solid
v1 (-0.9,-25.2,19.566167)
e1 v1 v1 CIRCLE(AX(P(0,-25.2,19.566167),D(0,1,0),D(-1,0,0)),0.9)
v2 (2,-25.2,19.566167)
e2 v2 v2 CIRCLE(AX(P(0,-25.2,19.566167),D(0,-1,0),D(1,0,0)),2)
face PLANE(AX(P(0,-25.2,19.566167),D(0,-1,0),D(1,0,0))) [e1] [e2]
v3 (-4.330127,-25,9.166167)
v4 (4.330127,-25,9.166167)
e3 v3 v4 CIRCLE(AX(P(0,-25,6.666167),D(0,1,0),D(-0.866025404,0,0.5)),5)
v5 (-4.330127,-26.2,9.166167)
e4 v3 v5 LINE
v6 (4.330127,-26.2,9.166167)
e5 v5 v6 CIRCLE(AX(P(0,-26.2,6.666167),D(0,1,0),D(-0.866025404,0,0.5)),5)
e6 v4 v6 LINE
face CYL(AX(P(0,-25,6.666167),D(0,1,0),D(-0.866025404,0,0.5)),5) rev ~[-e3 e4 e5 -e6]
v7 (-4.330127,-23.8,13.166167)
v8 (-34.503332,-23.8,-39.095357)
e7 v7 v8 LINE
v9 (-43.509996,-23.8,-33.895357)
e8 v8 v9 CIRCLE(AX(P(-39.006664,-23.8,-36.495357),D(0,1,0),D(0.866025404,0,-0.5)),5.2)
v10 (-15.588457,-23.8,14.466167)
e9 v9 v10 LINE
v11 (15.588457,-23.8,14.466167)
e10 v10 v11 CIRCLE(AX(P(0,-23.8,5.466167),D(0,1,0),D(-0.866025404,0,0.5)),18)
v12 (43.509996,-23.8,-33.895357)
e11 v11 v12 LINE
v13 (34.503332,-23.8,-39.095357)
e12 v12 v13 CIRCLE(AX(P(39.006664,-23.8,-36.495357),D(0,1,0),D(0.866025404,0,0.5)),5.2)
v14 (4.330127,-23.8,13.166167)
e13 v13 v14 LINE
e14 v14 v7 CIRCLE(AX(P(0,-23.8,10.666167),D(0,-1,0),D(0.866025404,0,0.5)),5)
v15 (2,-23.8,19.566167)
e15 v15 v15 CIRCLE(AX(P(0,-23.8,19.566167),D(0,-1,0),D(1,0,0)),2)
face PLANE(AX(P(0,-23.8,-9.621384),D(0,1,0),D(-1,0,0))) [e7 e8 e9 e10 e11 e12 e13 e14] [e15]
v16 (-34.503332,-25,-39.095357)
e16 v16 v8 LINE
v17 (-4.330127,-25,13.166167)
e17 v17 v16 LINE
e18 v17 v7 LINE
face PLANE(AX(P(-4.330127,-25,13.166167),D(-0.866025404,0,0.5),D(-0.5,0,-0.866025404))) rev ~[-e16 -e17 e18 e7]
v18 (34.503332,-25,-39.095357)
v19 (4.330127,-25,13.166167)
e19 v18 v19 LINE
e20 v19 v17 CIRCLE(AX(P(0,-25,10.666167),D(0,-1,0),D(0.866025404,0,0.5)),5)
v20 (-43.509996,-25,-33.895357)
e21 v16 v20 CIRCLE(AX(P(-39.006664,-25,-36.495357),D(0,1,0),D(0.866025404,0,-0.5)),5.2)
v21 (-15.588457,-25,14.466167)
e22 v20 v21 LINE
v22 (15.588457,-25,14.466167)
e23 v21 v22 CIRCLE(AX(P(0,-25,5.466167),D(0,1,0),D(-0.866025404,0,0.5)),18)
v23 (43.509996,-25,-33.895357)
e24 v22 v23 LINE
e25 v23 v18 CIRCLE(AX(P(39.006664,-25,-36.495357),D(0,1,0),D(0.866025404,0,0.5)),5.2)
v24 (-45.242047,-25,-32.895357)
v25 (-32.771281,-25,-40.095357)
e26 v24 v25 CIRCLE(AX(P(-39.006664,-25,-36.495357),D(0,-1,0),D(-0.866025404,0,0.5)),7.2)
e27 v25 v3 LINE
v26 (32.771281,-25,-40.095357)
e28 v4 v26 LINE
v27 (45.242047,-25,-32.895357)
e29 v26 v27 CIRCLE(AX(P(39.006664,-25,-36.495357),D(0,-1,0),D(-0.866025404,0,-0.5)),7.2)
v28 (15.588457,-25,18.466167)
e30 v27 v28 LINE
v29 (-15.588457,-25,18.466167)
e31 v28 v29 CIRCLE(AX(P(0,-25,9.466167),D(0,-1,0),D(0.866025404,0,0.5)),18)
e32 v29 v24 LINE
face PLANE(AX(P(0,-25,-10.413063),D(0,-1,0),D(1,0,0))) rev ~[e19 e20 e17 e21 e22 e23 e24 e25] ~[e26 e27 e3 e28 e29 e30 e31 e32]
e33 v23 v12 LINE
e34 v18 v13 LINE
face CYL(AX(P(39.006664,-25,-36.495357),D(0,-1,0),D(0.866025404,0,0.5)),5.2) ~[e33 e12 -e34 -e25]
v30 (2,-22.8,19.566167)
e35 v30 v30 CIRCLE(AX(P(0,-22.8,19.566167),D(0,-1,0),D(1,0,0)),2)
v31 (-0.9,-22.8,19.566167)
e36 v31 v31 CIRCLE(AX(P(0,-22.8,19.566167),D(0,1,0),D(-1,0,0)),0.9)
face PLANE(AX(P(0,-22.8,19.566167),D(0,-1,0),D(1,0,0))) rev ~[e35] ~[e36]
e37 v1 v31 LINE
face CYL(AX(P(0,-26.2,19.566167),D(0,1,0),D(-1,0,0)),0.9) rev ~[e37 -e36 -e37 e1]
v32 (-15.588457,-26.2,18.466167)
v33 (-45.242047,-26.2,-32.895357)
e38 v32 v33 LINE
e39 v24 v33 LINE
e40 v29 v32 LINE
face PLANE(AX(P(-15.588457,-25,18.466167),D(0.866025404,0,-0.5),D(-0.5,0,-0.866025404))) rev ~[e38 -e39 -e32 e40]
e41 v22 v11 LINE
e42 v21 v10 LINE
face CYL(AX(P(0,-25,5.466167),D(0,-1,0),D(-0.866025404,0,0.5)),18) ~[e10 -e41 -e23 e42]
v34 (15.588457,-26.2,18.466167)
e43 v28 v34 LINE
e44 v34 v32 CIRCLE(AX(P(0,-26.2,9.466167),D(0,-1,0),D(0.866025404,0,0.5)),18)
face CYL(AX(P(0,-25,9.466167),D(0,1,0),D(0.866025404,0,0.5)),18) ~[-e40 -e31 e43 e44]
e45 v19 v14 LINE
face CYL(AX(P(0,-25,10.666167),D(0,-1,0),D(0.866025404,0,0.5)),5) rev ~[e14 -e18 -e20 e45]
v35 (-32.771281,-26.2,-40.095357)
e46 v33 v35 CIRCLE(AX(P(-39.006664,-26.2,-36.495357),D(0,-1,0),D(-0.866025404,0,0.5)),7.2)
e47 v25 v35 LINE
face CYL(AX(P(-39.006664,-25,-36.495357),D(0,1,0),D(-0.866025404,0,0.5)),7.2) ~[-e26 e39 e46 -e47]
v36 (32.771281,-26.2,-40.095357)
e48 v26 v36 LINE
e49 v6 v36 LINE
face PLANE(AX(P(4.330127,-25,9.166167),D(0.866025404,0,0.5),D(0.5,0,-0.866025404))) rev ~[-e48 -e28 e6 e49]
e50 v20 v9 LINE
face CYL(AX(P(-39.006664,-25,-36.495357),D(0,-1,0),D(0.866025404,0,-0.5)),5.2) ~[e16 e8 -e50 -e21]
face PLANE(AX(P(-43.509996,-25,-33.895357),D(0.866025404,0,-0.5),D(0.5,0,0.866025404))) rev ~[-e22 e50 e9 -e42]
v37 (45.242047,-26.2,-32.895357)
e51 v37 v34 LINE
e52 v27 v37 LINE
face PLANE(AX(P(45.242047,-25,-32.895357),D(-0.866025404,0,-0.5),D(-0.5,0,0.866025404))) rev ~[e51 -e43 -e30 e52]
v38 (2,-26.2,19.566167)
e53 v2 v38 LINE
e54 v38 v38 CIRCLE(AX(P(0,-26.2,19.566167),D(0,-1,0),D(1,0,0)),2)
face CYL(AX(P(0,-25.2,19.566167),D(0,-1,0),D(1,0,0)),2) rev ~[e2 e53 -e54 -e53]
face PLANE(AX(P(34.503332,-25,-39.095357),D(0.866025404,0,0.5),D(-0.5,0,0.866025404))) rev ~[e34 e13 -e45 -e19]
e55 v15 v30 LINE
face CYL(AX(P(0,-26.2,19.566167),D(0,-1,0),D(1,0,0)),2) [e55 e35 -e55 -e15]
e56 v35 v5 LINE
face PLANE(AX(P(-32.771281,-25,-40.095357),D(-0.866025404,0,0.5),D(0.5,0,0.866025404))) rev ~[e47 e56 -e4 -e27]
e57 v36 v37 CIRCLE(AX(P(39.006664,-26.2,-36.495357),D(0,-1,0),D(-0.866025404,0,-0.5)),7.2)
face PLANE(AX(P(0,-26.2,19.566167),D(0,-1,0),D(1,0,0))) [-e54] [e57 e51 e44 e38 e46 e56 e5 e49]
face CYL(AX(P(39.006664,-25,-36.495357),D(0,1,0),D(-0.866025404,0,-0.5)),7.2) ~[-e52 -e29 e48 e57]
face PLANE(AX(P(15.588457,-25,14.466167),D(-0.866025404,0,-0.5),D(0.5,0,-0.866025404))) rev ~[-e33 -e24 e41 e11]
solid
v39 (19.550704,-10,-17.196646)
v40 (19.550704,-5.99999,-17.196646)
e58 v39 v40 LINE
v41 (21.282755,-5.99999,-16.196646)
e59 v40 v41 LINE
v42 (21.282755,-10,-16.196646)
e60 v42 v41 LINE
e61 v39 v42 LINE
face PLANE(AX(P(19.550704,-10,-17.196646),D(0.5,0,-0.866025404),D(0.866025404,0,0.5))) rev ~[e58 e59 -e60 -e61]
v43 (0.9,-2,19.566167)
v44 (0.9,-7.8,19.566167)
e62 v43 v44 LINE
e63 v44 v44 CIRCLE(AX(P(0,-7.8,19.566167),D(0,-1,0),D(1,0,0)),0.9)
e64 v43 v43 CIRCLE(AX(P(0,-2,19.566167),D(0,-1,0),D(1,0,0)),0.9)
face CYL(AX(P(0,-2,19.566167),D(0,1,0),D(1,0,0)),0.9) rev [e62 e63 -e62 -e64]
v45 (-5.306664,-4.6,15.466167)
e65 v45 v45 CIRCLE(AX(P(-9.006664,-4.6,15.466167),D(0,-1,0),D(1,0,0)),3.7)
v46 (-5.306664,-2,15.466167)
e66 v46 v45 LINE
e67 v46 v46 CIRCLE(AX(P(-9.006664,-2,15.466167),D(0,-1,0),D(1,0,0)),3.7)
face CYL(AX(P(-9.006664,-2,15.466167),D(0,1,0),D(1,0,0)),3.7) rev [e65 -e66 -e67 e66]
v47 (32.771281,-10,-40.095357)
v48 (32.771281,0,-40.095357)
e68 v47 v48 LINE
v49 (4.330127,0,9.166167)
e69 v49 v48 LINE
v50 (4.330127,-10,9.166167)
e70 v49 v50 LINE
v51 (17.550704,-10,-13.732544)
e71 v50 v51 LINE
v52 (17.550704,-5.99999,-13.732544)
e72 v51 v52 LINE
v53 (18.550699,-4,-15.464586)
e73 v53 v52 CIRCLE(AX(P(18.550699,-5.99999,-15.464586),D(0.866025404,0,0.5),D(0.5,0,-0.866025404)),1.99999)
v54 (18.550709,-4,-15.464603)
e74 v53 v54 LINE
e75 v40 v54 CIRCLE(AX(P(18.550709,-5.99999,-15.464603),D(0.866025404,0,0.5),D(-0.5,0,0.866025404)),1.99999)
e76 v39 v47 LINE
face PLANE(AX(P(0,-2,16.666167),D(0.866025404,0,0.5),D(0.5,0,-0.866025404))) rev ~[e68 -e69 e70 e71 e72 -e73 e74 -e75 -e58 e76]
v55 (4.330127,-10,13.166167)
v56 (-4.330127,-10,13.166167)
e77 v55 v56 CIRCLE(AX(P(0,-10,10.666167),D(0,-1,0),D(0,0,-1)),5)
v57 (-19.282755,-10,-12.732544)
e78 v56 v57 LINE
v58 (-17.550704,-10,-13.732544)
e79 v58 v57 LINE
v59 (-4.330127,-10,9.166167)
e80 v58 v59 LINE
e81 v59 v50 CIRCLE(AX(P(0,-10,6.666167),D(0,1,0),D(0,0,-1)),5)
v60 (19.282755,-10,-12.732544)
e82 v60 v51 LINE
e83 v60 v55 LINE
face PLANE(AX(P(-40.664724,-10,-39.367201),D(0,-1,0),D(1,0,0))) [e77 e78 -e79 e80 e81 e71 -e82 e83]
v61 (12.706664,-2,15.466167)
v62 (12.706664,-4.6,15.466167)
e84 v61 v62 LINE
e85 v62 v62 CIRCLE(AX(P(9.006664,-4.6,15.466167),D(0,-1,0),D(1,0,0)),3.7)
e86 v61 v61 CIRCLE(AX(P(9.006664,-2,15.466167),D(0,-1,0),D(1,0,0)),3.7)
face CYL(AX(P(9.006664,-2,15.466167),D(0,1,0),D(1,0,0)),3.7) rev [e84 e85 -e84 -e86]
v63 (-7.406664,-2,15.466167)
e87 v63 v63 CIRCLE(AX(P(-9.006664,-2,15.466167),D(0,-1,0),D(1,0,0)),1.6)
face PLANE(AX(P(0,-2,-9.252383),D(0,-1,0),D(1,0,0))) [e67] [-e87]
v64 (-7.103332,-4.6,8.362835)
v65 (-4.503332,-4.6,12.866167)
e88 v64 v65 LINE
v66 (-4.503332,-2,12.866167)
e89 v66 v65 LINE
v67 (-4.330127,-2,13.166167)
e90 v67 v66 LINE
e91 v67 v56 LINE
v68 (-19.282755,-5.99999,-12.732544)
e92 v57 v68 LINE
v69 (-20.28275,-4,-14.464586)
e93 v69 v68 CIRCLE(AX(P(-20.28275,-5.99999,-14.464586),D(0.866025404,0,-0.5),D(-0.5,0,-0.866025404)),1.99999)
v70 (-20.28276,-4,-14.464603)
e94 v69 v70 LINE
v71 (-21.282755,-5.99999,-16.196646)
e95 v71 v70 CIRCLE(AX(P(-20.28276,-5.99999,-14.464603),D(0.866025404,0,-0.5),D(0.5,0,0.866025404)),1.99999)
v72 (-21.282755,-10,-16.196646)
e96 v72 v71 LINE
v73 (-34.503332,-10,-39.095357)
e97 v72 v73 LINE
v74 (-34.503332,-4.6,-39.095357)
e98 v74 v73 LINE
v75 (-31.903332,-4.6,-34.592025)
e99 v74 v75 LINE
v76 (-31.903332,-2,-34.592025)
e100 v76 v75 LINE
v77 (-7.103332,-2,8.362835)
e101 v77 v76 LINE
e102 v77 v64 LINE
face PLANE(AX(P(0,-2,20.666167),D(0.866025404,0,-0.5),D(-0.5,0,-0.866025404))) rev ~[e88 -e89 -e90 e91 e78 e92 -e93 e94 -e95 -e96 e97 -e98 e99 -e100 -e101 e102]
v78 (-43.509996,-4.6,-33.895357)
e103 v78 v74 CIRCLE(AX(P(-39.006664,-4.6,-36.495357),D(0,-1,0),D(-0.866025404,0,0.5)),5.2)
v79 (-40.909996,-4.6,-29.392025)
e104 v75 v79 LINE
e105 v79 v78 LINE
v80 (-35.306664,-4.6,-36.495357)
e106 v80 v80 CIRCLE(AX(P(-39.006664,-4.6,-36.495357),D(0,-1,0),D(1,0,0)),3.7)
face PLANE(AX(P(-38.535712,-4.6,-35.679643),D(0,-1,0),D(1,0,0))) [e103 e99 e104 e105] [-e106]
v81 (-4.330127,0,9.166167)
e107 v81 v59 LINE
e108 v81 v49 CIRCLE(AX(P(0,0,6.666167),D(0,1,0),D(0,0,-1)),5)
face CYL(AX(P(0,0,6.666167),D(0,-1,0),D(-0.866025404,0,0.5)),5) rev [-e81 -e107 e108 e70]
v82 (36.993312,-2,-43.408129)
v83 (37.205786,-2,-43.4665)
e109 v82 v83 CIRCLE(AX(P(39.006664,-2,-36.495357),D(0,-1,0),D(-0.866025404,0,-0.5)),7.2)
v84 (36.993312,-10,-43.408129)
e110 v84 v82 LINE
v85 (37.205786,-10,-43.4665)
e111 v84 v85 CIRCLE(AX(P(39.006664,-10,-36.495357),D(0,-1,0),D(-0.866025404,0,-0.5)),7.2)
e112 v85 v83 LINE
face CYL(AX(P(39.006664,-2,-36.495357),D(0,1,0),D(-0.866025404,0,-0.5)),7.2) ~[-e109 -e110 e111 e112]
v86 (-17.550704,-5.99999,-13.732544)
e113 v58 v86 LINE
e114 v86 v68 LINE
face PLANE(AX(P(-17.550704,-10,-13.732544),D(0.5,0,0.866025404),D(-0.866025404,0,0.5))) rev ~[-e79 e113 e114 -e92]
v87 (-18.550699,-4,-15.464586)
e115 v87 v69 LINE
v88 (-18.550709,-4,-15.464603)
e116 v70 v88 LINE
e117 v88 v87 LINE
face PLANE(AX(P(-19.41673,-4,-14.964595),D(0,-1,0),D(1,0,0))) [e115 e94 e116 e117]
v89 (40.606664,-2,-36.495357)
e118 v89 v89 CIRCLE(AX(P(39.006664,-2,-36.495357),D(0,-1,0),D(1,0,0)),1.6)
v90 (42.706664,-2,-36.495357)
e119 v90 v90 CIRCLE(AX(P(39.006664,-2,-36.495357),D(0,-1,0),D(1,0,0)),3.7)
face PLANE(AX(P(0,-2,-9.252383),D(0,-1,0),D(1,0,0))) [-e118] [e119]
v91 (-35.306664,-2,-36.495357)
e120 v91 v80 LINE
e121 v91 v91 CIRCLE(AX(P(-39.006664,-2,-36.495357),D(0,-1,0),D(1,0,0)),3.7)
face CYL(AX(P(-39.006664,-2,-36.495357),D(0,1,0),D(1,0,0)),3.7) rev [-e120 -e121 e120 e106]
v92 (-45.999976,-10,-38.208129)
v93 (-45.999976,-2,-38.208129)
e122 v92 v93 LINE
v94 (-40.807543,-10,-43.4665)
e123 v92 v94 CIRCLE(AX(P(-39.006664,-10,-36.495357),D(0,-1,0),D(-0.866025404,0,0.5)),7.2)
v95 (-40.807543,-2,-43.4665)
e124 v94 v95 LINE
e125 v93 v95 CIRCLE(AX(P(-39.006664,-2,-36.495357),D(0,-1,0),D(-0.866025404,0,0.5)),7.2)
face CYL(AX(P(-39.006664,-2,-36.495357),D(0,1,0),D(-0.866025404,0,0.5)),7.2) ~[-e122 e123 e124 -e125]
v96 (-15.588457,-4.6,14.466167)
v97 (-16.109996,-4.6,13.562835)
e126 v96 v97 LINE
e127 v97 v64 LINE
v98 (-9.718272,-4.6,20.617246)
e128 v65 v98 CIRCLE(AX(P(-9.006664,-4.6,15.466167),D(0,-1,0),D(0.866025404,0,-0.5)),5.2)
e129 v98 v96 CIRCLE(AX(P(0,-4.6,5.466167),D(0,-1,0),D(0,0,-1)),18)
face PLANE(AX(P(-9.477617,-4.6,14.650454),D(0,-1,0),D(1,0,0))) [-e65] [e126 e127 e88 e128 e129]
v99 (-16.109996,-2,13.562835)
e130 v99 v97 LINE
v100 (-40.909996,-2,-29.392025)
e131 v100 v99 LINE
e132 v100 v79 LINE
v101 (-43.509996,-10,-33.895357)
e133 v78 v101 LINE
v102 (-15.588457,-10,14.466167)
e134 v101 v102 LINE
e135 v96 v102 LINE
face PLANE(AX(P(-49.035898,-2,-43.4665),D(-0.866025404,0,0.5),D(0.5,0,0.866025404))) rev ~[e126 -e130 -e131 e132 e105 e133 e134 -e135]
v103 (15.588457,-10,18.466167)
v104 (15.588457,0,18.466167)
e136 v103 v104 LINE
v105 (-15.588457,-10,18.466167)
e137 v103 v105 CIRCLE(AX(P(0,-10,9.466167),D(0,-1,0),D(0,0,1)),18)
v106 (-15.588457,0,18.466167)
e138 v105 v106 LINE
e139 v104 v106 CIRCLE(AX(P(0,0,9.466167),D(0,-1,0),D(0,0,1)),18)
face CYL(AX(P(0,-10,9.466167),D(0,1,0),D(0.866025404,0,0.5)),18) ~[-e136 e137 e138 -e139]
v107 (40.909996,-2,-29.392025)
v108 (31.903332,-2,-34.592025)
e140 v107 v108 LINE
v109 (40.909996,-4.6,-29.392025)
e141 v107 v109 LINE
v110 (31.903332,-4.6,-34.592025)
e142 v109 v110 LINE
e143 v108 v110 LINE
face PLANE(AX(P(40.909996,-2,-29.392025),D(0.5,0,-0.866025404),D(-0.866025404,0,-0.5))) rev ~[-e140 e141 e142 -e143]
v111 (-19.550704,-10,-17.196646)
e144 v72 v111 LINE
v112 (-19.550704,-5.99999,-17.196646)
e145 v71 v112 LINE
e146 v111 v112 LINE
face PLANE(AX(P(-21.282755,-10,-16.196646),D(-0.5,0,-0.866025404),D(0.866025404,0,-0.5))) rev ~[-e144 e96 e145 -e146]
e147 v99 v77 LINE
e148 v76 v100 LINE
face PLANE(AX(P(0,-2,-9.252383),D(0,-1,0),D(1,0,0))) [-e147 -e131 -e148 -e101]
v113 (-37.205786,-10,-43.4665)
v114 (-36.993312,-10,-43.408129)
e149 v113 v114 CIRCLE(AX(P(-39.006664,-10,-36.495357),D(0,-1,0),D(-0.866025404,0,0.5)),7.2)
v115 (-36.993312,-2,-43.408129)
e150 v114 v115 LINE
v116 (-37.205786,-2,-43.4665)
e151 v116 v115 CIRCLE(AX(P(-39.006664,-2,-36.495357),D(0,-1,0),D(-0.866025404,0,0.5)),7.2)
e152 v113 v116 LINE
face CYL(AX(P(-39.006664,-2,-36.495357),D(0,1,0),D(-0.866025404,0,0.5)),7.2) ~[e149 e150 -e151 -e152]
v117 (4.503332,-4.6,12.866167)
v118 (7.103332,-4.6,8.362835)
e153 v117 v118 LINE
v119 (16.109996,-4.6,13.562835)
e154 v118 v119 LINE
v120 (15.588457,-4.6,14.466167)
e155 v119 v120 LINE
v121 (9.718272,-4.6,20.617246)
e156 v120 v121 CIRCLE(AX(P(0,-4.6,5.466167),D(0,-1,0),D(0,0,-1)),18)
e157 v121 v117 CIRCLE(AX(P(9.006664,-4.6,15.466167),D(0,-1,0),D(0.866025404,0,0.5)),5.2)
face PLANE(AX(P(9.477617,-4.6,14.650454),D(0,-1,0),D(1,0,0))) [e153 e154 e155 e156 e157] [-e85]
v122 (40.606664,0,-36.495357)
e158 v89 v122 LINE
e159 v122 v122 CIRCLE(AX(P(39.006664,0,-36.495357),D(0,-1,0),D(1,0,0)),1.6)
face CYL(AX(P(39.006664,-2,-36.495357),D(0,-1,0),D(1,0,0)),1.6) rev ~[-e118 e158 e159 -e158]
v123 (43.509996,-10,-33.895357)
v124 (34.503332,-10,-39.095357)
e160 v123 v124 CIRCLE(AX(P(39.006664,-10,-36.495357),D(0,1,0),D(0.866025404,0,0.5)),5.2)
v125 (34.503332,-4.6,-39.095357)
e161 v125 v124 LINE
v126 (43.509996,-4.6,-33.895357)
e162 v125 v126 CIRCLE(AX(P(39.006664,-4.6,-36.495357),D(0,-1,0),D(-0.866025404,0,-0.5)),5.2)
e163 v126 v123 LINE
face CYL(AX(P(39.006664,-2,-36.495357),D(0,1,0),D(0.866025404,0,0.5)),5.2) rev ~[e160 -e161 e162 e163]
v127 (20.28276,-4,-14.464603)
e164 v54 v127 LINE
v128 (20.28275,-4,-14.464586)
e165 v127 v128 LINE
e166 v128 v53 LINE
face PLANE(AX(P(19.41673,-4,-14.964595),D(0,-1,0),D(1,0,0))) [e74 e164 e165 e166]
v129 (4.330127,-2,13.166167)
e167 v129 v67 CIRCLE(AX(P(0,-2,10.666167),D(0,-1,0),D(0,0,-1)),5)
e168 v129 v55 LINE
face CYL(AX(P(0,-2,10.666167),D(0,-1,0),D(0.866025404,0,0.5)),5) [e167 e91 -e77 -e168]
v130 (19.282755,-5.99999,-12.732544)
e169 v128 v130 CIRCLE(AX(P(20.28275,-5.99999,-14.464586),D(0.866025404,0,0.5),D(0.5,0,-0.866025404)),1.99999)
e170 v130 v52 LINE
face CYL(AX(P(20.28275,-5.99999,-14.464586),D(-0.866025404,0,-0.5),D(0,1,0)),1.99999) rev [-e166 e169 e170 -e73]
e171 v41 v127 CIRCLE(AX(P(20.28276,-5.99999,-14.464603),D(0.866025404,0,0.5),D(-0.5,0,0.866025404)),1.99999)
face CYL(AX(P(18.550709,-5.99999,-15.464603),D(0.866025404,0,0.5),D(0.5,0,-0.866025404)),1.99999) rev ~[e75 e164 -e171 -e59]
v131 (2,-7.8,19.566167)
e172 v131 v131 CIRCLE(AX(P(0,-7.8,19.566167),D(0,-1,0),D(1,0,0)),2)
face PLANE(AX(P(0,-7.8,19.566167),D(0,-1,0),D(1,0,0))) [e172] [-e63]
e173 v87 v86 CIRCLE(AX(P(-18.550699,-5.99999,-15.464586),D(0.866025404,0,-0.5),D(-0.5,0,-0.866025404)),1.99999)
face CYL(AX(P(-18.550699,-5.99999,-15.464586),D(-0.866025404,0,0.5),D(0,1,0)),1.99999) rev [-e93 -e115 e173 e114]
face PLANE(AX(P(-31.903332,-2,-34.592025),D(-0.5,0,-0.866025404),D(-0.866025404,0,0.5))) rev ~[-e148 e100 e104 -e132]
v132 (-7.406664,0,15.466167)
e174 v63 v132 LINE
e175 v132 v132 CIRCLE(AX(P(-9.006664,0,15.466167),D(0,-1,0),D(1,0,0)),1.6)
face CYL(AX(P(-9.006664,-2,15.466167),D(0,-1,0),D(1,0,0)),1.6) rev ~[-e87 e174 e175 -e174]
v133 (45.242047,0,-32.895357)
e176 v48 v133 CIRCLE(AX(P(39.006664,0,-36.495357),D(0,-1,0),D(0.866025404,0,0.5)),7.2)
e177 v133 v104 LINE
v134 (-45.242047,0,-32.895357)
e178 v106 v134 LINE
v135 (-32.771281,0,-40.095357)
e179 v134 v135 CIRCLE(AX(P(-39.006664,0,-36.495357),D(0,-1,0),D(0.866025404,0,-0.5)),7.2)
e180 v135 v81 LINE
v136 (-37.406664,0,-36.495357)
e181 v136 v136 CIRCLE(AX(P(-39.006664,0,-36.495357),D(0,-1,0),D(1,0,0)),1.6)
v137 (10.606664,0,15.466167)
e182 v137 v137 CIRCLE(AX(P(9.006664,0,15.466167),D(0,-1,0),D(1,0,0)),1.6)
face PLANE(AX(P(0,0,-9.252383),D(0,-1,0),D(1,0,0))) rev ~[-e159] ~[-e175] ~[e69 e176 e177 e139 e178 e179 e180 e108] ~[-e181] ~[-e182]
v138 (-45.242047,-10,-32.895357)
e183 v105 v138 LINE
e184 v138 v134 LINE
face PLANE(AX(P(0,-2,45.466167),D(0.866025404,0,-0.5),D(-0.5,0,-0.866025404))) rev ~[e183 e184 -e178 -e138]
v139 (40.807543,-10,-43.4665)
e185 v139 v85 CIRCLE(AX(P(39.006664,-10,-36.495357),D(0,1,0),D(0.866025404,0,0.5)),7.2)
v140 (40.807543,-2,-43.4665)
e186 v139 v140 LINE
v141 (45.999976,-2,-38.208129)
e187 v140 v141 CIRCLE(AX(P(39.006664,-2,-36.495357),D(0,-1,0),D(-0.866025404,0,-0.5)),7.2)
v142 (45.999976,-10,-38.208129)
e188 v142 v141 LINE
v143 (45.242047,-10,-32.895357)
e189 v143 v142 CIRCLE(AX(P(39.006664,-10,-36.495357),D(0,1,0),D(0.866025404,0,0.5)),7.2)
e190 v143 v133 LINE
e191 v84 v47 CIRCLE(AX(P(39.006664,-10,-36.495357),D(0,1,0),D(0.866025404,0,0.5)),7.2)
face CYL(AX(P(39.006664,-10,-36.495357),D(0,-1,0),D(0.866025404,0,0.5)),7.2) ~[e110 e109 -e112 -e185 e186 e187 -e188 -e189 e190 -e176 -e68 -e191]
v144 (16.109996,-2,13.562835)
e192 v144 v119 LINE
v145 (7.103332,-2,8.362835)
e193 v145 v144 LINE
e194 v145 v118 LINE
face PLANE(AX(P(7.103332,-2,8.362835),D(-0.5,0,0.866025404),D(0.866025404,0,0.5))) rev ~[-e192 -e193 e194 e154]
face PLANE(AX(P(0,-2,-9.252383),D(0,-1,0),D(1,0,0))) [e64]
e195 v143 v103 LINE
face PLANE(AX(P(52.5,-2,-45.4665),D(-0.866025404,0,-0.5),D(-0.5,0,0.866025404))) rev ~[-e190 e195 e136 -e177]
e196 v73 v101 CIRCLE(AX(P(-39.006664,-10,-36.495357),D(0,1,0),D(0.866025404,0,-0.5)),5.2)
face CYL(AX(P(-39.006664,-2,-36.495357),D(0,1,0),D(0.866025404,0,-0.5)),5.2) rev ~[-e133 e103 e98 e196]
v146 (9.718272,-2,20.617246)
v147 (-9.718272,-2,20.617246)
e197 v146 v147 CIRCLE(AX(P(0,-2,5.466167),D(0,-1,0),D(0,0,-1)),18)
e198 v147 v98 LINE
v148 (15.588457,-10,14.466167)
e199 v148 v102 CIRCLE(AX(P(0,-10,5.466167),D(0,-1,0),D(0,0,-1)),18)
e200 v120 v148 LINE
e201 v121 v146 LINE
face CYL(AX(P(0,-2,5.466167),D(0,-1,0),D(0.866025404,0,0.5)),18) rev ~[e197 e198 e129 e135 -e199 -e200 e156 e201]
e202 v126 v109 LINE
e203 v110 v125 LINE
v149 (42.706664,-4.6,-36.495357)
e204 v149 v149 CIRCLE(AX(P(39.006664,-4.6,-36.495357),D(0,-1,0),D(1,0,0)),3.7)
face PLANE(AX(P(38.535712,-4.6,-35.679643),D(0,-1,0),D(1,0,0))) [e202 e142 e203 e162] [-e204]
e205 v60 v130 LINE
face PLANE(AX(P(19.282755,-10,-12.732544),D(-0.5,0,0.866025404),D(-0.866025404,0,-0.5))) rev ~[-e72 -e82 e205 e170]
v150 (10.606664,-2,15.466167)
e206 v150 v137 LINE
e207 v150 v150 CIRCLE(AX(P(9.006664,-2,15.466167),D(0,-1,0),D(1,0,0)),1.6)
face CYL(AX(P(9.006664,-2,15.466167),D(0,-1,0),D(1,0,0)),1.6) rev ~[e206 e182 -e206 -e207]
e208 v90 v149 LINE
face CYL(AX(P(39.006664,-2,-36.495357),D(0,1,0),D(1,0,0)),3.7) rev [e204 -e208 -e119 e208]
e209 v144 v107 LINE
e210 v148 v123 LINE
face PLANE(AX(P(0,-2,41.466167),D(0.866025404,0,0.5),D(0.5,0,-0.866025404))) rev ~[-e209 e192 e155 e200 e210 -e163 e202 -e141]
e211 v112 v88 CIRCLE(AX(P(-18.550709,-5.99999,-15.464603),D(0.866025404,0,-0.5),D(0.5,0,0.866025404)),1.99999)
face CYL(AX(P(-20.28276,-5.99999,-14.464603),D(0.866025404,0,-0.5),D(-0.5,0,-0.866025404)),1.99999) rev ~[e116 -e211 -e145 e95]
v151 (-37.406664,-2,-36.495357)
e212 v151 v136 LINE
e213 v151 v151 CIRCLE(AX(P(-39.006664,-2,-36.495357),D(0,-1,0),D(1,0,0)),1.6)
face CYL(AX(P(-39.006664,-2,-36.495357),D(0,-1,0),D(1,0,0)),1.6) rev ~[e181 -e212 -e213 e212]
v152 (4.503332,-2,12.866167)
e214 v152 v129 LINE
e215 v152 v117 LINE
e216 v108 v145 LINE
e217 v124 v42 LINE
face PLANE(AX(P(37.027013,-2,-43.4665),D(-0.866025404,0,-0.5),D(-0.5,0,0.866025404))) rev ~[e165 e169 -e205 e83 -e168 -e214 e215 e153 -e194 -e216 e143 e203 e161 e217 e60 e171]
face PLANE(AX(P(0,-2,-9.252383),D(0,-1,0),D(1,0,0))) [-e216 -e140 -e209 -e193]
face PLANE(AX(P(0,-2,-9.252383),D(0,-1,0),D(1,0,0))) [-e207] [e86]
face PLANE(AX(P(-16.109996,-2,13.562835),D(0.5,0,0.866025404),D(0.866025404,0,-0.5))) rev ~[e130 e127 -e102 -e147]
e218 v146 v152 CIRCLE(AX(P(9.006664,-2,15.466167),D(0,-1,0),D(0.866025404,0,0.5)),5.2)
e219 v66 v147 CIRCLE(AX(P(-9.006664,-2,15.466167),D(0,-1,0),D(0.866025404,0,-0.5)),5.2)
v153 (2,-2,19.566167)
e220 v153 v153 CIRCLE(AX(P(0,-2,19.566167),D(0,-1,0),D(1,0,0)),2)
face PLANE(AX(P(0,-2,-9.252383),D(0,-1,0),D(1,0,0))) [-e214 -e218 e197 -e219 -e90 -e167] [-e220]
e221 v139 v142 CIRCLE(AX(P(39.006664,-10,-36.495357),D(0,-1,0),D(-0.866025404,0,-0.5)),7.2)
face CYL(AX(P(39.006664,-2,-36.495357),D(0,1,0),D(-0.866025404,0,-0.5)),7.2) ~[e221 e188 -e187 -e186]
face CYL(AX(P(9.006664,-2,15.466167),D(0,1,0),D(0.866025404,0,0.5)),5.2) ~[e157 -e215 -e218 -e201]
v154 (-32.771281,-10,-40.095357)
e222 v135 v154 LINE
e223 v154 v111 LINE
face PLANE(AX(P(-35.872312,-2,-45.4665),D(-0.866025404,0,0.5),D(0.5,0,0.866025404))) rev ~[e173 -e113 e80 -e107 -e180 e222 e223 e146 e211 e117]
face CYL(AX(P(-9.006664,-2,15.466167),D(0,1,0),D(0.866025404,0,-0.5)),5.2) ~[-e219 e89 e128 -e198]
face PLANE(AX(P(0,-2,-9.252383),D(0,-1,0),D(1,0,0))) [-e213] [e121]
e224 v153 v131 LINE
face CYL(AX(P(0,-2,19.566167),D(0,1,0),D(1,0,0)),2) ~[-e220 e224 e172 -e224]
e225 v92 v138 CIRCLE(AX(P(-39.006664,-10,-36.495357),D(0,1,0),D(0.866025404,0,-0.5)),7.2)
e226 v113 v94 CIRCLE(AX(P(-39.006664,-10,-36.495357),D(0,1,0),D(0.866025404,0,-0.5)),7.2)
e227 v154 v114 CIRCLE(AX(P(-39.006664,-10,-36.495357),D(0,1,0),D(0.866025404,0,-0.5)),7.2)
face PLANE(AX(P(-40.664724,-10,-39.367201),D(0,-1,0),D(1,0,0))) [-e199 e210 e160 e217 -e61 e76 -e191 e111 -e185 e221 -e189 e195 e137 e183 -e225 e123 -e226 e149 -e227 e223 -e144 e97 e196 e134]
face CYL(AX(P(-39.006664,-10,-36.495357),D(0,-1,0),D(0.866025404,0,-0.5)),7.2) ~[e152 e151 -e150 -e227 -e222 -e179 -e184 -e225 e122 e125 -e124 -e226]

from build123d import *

# Parameters (mm, degrees)
F1_DEPTH        = 2
F3_DEPTH        = 8
F4_R            = 3.7
F5_DEPTH        = 2.6
F7_DEPTH        = 8
F9_DEPTH        = 10.001
F10_R           = 18
F11_R           = 5
F12_R           = 1.6
F13_DEPTH       = 2.001
F15_DEPTH       = 6
F16_R           = 1.99999
F17_R           = 2
F17_R_2         = 0.9
F18_DEPTH       = 5.8
F21_DEPTH       = 1.2
F23_DEPTH       = 1.2
F24_R           = 2
F25_DEPTH       = 3.4
F26_D           = 1.8
F26_CBORE_D     = 4
F26_CBORE_DEPTH = 1


# Not quite as in the source:
# - a fillet or chamfer is up to 0.001 mm smaller than in the source, because OpenCascade refuses the exact size


with BuildPart() as f1:
    # F0 (on Front) → F1 (new body)
    with BuildSketch(Plane.XZ):
        Polygon((52.5, -45.4665), (0, 45.4661673974), (-52.5, -45.4665), (-35.8723122473, -45.4665), (0, 16.6661673974), (35.8723122473, -45.4665), align=None)
    extrude(amount=F1_DEPTH)

    # F2 (on face) → F3 (join)
    with BuildSketch(Plane.XZ.offset(2)):
        Polygon((-35.8723122473, -45.4665), (0, 16.6661673974), (35.8723122473, -45.4665), (52.5, -45.4665), (0, 45.4661673974), (-52.5, -45.4665), align=None)
        Polygon((49.0358983849, -43.4665), (37.0270127857, -43.4665), (0, 20.6661673974), (-37.0270127857, -43.4665), (-49.0358983849, -43.4665), (0, 41.4661673974), align=None, mode=Mode.SUBTRACT)
    extrude(amount=F3_DEPTH)

    # F4 (on face) → F5 (join)
    with BuildSketch(Plane.XZ.offset(2)):
        with BuildLine():
            Line((-40.909996299, -29.39202473), (-43.509996299, -33.8953568297))
            ThreePointArc((-43.509996299, -33.8953568297), (-41.6066641994, -40.9986889294), (-34.5033320997, -39.0953568297))
            Line((-34.5033320997, -39.0953568297), (-31.9033320997, -34.59202473))
            Line((-31.9033320997, -34.59202473), (-40.909996299, -29.39202473))
        make_face()
        with Locations((-39.0066641994, -36.4953568297)):
            Circle(F4_R, mode=Mode.SUBTRACT)
        with BuildLine():
            Line((-7.1033320997, 8.3628352977), (-4.5033320997, 12.8661673974))
            ThreePointArc((-4.5033320997, 12.8661673974), (-6.4066641994, 19.969499497), (-13.509996299, 18.0661673974))
            Line((-13.509996299, 18.0661673974), (-16.109996299, 13.5628352977))
            Line((-16.109996299, 13.5628352977), (-7.1033320997, 8.3628352977))
        make_face()
        with Locations((-9.0066641994, 15.4661673974)):
            Circle(F4_R, mode=Mode.SUBTRACT)
        with BuildLine():
            Line((43.509996299, -33.8953568297), (40.909996299, -29.39202473))
            Line((40.909996299, -29.39202473), (31.9033320997, -34.59202473))
            Line((31.9033320997, -34.59202473), (34.5033320997, -39.0953568297))
            ThreePointArc((34.5033320997, -39.0953568297), (41.6066641994, -40.9986889294), (43.509996299, -33.8953568297))
        make_face()
        with Locations((39.0066641994, -36.4953568297)):
            Circle(F4_R, mode=Mode.SUBTRACT)
        with BuildLine():
            ThreePointArc((13.509996299, 18.0661673974), (6.4066641994, 19.969499497), (4.5033320997, 12.8661673974))
            Line((4.5033320997, 12.8661673974), (7.1033320997, 8.3628352977))
            Line((7.1033320997, 8.3628352977), (16.109996299, 13.5628352977))
            Line((16.109996299, 13.5628352977), (13.509996299, 18.0661673974))
        make_face()
        with Locations((9.0066641994, 15.4661673974)):
            Circle(F4_R, mode=Mode.SUBTRACT)
    extrude(amount=F5_DEPTH)

    # F6 (on face) → F7 (join, through all)
    with BuildSketch(Plane.XZ.offset(2)):
        with BuildLine():
            ThreePointArc((-34.5033320997, -39.0953568297), (-41.6066641994, -40.9986889294), (-43.509996299, -33.8953568297))
            Line((-43.509996299, -33.8953568297), (-45.2420471066, -32.8953568297))
            ThreePointArc((-45.2420471066, -32.8953568297), (-42.6066641994, -42.7307397369), (-32.7712812921, -40.0953568297))
            Line((-32.7712812921, -40.0953568297), (-34.5033320997, -39.0953568297))
        make_face()
        with BuildLine():
            Line((45.2420471066, -32.8953568297), (43.509996299, -33.8953568297))
            ThreePointArc((43.509996299, -33.8953568297), (41.6066641994, -40.9986889294), (34.5033320997, -39.0953568297))
            Line((34.5033320997, -39.0953568297), (32.7712812921, -40.0953568297))
            ThreePointArc((32.7712812921, -40.0953568297), (42.6066641994, -42.7307397369), (45.2420471066, -32.8953568297))
        make_face()
    extrude(amount=F7_DEPTH)

    # F8 (on face) → F9 (cut, through all)
    with BuildSketch(Plane.XZ.offset(10)):
        with BuildLine():
            ThreePointArc((-32.7712812921, -40.0953568297), (-42.6066641994, -42.7307397369), (-45.2420471066, -32.8953568297))
            Line((-45.2420471066, -32.8953568297), (-52.5, -45.4665))
            Line((-52.5, -45.4665), (-35.8723122473, -45.4665))
            Line((-35.8723122473, -45.4665), (-32.7712812921, -40.0953568297))
        make_face()
        with BuildLine():
            Line((52.5, -45.4665), (45.2420471066, -32.8953568297))
            ThreePointArc((45.2420471066, -32.8953568297), (42.6066641994, -42.7307397369), (32.7712812921, -40.0953568297))
            Line((32.7712812921, -40.0953568297), (35.8723122473, -45.4665))
            Line((35.8723122473, -45.4665), (52.5, -45.4665))
        make_face()
    extrude(amount=-F9_DEPTH, mode=Mode.SUBTRACT)

    # F10
    f10_edges = [f1.edges().sort_by_distance(p)[0] for p in [
        (0, -6, 41.466167),
        (0, -5, 45.466167),
    ]]
    fillet(f10_edges, radius=F10_R)

    # F11
    f11_edges = [f1.edges().sort_by_distance(p)[0] for p in [
        (0, -5, 16.666167),
        (0, -6, 20.666167),
    ]]
    fillet(f11_edges, radius=F11_R)

    # F12 (on face) → F13 (cut, through all)
    with BuildSketch(Plane.XZ.offset(2)):
        with Locations((-9.0066641994, 15.4661673974)):
            Circle(F12_R)
        with Locations((9.0066641994, 15.4661673974)):
            Circle(F12_R)
        with Locations((-39.0066641994, -36.4953568297)):
            Circle(F12_R)
        with Locations((39.0066641994, -36.4953568297)):
            Circle(F12_R)
    extrude(amount=-F13_DEPTH, mode=Mode.SUBTRACT)

    # F14 (on face) → F15 (cut)
    with BuildSketch(Plane.XZ.offset(10)):
        Polygon((-21.2827549631, -16.1966455237), (-19.5507041555, -17.1966455237), (-17.5507041555, -13.7325439086), (-19.2827549631, -12.7325439086), align=None)
        Polygon((19.5507041555, -17.1966455237), (21.2827549631, -16.1966455237), (19.2827549631, -12.7325439086), (17.5507041555, -13.7325439086), align=None)
    extrude(amount=-F15_DEPTH, mode=Mode.SUBTRACT)

    # F16 (radius 2 in the source; OpenCascade refuses exactly that, so slightly less here)
    f16_edges = [f1.edges().sort_by_distance(p)[0] for p in [
        (-18.41673, -4, -13.232544),
        (18.41673, -4, -13.232544),
        (20.41673, -4, -16.696646),
        (-20.41673, -4, -16.696646),
    ]]
    fillet(f16_edges, radius=F16_R)

    # F17 (on face) → F18 (join)
    with BuildSketch(Plane.XZ.offset(2)):
        with Locations((0, 19.5661673974)):
            Circle(F17_R)
        with Locations((0, 19.5661673974)):
            Circle(F17_R_2, mode=Mode.SUBTRACT)
    extrude(amount=F18_DEPTH)


with BuildPart() as f21:
    # F20 (on offset) → F21 (new body)
    with BuildSketch(Plane.XZ.offset(25)):
        with BuildLine():
            Line((45.2420471066, -32.8953568297), (15.5884572681, 18.4661673974))
            ThreePointArc((15.5884572681, 18.4661673974), (0, 27.4661673974), (-15.5884572681, 18.4661673974))
            Line((-15.5884572681, 18.4661673974), (-45.2420471066, -32.8953568297))
            ThreePointArc((-45.2420471066, -32.8953568297), (-42.6066641994, -42.7307397369), (-32.7712812921, -40.0953568297))
            Line((-32.7712812921, -40.0953568297), (-4.3301270189, 9.1661673974))
            ThreePointArc((-4.3301270189, 9.1661673974), (0, 11.6661673974), (4.3301270189, 9.1661673974))
            Line((4.3301270189, 9.1661673974), (32.7712812921, -40.0953568297))
            ThreePointArc((32.7712812921, -40.0953568297), (42.6066641994, -42.7307397369), (45.2420471066, -32.8953568297))
        make_face()
    extrude(amount=F21_DEPTH)

    # F22 (on face) → F23 (join)
    with BuildSketch(Plane(origin=(0, -25, 0), x_dir=(-1, 0, 0), z_dir=(0, 1, 0))):
        with BuildLine():
            Line((-34.5033320997, -39.0953568297), (-4.3301270189, 13.1661673974))
            ThreePointArc((-4.3301270189, 13.1661673974), (0, 15.6661673974), (4.3301270189, 13.1661673974))
            Line((4.3301270189, 13.1661673974), (34.5033320997, -39.0953568297))
            ThreePointArc((34.5033320997, -39.0953568297), (41.6066641994, -40.9986889294), (43.509996299, -33.8953568297))
            Line((43.509996299, -33.8953568297), (15.5884572681, 14.4661673974))
            ThreePointArc((15.5884572681, 14.4661673974), (0, 23.4661673974), (-15.5884572681, 14.4661673974))
            Line((-15.5884572681, 14.4661673974), (-43.509996299, -33.8953568297))
            ThreePointArc((-43.509996299, -33.8953568297), (-41.6066641994, -40.9986889294), (-34.5033320997, -39.0953568297))
        make_face()
    extrude(amount=F23_DEPTH)

    # F24 (on face) → F25 (join)
    with BuildSketch(Plane.XZ.offset(26.2)):
        with Locations((0, 19.5661673974)):
            Circle(F24_R)
    extrude(amount=-F25_DEPTH)

    # F26 (through all)
    with Locations(Plane.XZ.offset(26.2)):
        with Locations((0, 19.5661673974)):
            CounterBoreHole(F26_D / 2, F26_CBORE_D / 2, F26_CBORE_DEPTH)


solid = Compound([f1.part, f21.part])
